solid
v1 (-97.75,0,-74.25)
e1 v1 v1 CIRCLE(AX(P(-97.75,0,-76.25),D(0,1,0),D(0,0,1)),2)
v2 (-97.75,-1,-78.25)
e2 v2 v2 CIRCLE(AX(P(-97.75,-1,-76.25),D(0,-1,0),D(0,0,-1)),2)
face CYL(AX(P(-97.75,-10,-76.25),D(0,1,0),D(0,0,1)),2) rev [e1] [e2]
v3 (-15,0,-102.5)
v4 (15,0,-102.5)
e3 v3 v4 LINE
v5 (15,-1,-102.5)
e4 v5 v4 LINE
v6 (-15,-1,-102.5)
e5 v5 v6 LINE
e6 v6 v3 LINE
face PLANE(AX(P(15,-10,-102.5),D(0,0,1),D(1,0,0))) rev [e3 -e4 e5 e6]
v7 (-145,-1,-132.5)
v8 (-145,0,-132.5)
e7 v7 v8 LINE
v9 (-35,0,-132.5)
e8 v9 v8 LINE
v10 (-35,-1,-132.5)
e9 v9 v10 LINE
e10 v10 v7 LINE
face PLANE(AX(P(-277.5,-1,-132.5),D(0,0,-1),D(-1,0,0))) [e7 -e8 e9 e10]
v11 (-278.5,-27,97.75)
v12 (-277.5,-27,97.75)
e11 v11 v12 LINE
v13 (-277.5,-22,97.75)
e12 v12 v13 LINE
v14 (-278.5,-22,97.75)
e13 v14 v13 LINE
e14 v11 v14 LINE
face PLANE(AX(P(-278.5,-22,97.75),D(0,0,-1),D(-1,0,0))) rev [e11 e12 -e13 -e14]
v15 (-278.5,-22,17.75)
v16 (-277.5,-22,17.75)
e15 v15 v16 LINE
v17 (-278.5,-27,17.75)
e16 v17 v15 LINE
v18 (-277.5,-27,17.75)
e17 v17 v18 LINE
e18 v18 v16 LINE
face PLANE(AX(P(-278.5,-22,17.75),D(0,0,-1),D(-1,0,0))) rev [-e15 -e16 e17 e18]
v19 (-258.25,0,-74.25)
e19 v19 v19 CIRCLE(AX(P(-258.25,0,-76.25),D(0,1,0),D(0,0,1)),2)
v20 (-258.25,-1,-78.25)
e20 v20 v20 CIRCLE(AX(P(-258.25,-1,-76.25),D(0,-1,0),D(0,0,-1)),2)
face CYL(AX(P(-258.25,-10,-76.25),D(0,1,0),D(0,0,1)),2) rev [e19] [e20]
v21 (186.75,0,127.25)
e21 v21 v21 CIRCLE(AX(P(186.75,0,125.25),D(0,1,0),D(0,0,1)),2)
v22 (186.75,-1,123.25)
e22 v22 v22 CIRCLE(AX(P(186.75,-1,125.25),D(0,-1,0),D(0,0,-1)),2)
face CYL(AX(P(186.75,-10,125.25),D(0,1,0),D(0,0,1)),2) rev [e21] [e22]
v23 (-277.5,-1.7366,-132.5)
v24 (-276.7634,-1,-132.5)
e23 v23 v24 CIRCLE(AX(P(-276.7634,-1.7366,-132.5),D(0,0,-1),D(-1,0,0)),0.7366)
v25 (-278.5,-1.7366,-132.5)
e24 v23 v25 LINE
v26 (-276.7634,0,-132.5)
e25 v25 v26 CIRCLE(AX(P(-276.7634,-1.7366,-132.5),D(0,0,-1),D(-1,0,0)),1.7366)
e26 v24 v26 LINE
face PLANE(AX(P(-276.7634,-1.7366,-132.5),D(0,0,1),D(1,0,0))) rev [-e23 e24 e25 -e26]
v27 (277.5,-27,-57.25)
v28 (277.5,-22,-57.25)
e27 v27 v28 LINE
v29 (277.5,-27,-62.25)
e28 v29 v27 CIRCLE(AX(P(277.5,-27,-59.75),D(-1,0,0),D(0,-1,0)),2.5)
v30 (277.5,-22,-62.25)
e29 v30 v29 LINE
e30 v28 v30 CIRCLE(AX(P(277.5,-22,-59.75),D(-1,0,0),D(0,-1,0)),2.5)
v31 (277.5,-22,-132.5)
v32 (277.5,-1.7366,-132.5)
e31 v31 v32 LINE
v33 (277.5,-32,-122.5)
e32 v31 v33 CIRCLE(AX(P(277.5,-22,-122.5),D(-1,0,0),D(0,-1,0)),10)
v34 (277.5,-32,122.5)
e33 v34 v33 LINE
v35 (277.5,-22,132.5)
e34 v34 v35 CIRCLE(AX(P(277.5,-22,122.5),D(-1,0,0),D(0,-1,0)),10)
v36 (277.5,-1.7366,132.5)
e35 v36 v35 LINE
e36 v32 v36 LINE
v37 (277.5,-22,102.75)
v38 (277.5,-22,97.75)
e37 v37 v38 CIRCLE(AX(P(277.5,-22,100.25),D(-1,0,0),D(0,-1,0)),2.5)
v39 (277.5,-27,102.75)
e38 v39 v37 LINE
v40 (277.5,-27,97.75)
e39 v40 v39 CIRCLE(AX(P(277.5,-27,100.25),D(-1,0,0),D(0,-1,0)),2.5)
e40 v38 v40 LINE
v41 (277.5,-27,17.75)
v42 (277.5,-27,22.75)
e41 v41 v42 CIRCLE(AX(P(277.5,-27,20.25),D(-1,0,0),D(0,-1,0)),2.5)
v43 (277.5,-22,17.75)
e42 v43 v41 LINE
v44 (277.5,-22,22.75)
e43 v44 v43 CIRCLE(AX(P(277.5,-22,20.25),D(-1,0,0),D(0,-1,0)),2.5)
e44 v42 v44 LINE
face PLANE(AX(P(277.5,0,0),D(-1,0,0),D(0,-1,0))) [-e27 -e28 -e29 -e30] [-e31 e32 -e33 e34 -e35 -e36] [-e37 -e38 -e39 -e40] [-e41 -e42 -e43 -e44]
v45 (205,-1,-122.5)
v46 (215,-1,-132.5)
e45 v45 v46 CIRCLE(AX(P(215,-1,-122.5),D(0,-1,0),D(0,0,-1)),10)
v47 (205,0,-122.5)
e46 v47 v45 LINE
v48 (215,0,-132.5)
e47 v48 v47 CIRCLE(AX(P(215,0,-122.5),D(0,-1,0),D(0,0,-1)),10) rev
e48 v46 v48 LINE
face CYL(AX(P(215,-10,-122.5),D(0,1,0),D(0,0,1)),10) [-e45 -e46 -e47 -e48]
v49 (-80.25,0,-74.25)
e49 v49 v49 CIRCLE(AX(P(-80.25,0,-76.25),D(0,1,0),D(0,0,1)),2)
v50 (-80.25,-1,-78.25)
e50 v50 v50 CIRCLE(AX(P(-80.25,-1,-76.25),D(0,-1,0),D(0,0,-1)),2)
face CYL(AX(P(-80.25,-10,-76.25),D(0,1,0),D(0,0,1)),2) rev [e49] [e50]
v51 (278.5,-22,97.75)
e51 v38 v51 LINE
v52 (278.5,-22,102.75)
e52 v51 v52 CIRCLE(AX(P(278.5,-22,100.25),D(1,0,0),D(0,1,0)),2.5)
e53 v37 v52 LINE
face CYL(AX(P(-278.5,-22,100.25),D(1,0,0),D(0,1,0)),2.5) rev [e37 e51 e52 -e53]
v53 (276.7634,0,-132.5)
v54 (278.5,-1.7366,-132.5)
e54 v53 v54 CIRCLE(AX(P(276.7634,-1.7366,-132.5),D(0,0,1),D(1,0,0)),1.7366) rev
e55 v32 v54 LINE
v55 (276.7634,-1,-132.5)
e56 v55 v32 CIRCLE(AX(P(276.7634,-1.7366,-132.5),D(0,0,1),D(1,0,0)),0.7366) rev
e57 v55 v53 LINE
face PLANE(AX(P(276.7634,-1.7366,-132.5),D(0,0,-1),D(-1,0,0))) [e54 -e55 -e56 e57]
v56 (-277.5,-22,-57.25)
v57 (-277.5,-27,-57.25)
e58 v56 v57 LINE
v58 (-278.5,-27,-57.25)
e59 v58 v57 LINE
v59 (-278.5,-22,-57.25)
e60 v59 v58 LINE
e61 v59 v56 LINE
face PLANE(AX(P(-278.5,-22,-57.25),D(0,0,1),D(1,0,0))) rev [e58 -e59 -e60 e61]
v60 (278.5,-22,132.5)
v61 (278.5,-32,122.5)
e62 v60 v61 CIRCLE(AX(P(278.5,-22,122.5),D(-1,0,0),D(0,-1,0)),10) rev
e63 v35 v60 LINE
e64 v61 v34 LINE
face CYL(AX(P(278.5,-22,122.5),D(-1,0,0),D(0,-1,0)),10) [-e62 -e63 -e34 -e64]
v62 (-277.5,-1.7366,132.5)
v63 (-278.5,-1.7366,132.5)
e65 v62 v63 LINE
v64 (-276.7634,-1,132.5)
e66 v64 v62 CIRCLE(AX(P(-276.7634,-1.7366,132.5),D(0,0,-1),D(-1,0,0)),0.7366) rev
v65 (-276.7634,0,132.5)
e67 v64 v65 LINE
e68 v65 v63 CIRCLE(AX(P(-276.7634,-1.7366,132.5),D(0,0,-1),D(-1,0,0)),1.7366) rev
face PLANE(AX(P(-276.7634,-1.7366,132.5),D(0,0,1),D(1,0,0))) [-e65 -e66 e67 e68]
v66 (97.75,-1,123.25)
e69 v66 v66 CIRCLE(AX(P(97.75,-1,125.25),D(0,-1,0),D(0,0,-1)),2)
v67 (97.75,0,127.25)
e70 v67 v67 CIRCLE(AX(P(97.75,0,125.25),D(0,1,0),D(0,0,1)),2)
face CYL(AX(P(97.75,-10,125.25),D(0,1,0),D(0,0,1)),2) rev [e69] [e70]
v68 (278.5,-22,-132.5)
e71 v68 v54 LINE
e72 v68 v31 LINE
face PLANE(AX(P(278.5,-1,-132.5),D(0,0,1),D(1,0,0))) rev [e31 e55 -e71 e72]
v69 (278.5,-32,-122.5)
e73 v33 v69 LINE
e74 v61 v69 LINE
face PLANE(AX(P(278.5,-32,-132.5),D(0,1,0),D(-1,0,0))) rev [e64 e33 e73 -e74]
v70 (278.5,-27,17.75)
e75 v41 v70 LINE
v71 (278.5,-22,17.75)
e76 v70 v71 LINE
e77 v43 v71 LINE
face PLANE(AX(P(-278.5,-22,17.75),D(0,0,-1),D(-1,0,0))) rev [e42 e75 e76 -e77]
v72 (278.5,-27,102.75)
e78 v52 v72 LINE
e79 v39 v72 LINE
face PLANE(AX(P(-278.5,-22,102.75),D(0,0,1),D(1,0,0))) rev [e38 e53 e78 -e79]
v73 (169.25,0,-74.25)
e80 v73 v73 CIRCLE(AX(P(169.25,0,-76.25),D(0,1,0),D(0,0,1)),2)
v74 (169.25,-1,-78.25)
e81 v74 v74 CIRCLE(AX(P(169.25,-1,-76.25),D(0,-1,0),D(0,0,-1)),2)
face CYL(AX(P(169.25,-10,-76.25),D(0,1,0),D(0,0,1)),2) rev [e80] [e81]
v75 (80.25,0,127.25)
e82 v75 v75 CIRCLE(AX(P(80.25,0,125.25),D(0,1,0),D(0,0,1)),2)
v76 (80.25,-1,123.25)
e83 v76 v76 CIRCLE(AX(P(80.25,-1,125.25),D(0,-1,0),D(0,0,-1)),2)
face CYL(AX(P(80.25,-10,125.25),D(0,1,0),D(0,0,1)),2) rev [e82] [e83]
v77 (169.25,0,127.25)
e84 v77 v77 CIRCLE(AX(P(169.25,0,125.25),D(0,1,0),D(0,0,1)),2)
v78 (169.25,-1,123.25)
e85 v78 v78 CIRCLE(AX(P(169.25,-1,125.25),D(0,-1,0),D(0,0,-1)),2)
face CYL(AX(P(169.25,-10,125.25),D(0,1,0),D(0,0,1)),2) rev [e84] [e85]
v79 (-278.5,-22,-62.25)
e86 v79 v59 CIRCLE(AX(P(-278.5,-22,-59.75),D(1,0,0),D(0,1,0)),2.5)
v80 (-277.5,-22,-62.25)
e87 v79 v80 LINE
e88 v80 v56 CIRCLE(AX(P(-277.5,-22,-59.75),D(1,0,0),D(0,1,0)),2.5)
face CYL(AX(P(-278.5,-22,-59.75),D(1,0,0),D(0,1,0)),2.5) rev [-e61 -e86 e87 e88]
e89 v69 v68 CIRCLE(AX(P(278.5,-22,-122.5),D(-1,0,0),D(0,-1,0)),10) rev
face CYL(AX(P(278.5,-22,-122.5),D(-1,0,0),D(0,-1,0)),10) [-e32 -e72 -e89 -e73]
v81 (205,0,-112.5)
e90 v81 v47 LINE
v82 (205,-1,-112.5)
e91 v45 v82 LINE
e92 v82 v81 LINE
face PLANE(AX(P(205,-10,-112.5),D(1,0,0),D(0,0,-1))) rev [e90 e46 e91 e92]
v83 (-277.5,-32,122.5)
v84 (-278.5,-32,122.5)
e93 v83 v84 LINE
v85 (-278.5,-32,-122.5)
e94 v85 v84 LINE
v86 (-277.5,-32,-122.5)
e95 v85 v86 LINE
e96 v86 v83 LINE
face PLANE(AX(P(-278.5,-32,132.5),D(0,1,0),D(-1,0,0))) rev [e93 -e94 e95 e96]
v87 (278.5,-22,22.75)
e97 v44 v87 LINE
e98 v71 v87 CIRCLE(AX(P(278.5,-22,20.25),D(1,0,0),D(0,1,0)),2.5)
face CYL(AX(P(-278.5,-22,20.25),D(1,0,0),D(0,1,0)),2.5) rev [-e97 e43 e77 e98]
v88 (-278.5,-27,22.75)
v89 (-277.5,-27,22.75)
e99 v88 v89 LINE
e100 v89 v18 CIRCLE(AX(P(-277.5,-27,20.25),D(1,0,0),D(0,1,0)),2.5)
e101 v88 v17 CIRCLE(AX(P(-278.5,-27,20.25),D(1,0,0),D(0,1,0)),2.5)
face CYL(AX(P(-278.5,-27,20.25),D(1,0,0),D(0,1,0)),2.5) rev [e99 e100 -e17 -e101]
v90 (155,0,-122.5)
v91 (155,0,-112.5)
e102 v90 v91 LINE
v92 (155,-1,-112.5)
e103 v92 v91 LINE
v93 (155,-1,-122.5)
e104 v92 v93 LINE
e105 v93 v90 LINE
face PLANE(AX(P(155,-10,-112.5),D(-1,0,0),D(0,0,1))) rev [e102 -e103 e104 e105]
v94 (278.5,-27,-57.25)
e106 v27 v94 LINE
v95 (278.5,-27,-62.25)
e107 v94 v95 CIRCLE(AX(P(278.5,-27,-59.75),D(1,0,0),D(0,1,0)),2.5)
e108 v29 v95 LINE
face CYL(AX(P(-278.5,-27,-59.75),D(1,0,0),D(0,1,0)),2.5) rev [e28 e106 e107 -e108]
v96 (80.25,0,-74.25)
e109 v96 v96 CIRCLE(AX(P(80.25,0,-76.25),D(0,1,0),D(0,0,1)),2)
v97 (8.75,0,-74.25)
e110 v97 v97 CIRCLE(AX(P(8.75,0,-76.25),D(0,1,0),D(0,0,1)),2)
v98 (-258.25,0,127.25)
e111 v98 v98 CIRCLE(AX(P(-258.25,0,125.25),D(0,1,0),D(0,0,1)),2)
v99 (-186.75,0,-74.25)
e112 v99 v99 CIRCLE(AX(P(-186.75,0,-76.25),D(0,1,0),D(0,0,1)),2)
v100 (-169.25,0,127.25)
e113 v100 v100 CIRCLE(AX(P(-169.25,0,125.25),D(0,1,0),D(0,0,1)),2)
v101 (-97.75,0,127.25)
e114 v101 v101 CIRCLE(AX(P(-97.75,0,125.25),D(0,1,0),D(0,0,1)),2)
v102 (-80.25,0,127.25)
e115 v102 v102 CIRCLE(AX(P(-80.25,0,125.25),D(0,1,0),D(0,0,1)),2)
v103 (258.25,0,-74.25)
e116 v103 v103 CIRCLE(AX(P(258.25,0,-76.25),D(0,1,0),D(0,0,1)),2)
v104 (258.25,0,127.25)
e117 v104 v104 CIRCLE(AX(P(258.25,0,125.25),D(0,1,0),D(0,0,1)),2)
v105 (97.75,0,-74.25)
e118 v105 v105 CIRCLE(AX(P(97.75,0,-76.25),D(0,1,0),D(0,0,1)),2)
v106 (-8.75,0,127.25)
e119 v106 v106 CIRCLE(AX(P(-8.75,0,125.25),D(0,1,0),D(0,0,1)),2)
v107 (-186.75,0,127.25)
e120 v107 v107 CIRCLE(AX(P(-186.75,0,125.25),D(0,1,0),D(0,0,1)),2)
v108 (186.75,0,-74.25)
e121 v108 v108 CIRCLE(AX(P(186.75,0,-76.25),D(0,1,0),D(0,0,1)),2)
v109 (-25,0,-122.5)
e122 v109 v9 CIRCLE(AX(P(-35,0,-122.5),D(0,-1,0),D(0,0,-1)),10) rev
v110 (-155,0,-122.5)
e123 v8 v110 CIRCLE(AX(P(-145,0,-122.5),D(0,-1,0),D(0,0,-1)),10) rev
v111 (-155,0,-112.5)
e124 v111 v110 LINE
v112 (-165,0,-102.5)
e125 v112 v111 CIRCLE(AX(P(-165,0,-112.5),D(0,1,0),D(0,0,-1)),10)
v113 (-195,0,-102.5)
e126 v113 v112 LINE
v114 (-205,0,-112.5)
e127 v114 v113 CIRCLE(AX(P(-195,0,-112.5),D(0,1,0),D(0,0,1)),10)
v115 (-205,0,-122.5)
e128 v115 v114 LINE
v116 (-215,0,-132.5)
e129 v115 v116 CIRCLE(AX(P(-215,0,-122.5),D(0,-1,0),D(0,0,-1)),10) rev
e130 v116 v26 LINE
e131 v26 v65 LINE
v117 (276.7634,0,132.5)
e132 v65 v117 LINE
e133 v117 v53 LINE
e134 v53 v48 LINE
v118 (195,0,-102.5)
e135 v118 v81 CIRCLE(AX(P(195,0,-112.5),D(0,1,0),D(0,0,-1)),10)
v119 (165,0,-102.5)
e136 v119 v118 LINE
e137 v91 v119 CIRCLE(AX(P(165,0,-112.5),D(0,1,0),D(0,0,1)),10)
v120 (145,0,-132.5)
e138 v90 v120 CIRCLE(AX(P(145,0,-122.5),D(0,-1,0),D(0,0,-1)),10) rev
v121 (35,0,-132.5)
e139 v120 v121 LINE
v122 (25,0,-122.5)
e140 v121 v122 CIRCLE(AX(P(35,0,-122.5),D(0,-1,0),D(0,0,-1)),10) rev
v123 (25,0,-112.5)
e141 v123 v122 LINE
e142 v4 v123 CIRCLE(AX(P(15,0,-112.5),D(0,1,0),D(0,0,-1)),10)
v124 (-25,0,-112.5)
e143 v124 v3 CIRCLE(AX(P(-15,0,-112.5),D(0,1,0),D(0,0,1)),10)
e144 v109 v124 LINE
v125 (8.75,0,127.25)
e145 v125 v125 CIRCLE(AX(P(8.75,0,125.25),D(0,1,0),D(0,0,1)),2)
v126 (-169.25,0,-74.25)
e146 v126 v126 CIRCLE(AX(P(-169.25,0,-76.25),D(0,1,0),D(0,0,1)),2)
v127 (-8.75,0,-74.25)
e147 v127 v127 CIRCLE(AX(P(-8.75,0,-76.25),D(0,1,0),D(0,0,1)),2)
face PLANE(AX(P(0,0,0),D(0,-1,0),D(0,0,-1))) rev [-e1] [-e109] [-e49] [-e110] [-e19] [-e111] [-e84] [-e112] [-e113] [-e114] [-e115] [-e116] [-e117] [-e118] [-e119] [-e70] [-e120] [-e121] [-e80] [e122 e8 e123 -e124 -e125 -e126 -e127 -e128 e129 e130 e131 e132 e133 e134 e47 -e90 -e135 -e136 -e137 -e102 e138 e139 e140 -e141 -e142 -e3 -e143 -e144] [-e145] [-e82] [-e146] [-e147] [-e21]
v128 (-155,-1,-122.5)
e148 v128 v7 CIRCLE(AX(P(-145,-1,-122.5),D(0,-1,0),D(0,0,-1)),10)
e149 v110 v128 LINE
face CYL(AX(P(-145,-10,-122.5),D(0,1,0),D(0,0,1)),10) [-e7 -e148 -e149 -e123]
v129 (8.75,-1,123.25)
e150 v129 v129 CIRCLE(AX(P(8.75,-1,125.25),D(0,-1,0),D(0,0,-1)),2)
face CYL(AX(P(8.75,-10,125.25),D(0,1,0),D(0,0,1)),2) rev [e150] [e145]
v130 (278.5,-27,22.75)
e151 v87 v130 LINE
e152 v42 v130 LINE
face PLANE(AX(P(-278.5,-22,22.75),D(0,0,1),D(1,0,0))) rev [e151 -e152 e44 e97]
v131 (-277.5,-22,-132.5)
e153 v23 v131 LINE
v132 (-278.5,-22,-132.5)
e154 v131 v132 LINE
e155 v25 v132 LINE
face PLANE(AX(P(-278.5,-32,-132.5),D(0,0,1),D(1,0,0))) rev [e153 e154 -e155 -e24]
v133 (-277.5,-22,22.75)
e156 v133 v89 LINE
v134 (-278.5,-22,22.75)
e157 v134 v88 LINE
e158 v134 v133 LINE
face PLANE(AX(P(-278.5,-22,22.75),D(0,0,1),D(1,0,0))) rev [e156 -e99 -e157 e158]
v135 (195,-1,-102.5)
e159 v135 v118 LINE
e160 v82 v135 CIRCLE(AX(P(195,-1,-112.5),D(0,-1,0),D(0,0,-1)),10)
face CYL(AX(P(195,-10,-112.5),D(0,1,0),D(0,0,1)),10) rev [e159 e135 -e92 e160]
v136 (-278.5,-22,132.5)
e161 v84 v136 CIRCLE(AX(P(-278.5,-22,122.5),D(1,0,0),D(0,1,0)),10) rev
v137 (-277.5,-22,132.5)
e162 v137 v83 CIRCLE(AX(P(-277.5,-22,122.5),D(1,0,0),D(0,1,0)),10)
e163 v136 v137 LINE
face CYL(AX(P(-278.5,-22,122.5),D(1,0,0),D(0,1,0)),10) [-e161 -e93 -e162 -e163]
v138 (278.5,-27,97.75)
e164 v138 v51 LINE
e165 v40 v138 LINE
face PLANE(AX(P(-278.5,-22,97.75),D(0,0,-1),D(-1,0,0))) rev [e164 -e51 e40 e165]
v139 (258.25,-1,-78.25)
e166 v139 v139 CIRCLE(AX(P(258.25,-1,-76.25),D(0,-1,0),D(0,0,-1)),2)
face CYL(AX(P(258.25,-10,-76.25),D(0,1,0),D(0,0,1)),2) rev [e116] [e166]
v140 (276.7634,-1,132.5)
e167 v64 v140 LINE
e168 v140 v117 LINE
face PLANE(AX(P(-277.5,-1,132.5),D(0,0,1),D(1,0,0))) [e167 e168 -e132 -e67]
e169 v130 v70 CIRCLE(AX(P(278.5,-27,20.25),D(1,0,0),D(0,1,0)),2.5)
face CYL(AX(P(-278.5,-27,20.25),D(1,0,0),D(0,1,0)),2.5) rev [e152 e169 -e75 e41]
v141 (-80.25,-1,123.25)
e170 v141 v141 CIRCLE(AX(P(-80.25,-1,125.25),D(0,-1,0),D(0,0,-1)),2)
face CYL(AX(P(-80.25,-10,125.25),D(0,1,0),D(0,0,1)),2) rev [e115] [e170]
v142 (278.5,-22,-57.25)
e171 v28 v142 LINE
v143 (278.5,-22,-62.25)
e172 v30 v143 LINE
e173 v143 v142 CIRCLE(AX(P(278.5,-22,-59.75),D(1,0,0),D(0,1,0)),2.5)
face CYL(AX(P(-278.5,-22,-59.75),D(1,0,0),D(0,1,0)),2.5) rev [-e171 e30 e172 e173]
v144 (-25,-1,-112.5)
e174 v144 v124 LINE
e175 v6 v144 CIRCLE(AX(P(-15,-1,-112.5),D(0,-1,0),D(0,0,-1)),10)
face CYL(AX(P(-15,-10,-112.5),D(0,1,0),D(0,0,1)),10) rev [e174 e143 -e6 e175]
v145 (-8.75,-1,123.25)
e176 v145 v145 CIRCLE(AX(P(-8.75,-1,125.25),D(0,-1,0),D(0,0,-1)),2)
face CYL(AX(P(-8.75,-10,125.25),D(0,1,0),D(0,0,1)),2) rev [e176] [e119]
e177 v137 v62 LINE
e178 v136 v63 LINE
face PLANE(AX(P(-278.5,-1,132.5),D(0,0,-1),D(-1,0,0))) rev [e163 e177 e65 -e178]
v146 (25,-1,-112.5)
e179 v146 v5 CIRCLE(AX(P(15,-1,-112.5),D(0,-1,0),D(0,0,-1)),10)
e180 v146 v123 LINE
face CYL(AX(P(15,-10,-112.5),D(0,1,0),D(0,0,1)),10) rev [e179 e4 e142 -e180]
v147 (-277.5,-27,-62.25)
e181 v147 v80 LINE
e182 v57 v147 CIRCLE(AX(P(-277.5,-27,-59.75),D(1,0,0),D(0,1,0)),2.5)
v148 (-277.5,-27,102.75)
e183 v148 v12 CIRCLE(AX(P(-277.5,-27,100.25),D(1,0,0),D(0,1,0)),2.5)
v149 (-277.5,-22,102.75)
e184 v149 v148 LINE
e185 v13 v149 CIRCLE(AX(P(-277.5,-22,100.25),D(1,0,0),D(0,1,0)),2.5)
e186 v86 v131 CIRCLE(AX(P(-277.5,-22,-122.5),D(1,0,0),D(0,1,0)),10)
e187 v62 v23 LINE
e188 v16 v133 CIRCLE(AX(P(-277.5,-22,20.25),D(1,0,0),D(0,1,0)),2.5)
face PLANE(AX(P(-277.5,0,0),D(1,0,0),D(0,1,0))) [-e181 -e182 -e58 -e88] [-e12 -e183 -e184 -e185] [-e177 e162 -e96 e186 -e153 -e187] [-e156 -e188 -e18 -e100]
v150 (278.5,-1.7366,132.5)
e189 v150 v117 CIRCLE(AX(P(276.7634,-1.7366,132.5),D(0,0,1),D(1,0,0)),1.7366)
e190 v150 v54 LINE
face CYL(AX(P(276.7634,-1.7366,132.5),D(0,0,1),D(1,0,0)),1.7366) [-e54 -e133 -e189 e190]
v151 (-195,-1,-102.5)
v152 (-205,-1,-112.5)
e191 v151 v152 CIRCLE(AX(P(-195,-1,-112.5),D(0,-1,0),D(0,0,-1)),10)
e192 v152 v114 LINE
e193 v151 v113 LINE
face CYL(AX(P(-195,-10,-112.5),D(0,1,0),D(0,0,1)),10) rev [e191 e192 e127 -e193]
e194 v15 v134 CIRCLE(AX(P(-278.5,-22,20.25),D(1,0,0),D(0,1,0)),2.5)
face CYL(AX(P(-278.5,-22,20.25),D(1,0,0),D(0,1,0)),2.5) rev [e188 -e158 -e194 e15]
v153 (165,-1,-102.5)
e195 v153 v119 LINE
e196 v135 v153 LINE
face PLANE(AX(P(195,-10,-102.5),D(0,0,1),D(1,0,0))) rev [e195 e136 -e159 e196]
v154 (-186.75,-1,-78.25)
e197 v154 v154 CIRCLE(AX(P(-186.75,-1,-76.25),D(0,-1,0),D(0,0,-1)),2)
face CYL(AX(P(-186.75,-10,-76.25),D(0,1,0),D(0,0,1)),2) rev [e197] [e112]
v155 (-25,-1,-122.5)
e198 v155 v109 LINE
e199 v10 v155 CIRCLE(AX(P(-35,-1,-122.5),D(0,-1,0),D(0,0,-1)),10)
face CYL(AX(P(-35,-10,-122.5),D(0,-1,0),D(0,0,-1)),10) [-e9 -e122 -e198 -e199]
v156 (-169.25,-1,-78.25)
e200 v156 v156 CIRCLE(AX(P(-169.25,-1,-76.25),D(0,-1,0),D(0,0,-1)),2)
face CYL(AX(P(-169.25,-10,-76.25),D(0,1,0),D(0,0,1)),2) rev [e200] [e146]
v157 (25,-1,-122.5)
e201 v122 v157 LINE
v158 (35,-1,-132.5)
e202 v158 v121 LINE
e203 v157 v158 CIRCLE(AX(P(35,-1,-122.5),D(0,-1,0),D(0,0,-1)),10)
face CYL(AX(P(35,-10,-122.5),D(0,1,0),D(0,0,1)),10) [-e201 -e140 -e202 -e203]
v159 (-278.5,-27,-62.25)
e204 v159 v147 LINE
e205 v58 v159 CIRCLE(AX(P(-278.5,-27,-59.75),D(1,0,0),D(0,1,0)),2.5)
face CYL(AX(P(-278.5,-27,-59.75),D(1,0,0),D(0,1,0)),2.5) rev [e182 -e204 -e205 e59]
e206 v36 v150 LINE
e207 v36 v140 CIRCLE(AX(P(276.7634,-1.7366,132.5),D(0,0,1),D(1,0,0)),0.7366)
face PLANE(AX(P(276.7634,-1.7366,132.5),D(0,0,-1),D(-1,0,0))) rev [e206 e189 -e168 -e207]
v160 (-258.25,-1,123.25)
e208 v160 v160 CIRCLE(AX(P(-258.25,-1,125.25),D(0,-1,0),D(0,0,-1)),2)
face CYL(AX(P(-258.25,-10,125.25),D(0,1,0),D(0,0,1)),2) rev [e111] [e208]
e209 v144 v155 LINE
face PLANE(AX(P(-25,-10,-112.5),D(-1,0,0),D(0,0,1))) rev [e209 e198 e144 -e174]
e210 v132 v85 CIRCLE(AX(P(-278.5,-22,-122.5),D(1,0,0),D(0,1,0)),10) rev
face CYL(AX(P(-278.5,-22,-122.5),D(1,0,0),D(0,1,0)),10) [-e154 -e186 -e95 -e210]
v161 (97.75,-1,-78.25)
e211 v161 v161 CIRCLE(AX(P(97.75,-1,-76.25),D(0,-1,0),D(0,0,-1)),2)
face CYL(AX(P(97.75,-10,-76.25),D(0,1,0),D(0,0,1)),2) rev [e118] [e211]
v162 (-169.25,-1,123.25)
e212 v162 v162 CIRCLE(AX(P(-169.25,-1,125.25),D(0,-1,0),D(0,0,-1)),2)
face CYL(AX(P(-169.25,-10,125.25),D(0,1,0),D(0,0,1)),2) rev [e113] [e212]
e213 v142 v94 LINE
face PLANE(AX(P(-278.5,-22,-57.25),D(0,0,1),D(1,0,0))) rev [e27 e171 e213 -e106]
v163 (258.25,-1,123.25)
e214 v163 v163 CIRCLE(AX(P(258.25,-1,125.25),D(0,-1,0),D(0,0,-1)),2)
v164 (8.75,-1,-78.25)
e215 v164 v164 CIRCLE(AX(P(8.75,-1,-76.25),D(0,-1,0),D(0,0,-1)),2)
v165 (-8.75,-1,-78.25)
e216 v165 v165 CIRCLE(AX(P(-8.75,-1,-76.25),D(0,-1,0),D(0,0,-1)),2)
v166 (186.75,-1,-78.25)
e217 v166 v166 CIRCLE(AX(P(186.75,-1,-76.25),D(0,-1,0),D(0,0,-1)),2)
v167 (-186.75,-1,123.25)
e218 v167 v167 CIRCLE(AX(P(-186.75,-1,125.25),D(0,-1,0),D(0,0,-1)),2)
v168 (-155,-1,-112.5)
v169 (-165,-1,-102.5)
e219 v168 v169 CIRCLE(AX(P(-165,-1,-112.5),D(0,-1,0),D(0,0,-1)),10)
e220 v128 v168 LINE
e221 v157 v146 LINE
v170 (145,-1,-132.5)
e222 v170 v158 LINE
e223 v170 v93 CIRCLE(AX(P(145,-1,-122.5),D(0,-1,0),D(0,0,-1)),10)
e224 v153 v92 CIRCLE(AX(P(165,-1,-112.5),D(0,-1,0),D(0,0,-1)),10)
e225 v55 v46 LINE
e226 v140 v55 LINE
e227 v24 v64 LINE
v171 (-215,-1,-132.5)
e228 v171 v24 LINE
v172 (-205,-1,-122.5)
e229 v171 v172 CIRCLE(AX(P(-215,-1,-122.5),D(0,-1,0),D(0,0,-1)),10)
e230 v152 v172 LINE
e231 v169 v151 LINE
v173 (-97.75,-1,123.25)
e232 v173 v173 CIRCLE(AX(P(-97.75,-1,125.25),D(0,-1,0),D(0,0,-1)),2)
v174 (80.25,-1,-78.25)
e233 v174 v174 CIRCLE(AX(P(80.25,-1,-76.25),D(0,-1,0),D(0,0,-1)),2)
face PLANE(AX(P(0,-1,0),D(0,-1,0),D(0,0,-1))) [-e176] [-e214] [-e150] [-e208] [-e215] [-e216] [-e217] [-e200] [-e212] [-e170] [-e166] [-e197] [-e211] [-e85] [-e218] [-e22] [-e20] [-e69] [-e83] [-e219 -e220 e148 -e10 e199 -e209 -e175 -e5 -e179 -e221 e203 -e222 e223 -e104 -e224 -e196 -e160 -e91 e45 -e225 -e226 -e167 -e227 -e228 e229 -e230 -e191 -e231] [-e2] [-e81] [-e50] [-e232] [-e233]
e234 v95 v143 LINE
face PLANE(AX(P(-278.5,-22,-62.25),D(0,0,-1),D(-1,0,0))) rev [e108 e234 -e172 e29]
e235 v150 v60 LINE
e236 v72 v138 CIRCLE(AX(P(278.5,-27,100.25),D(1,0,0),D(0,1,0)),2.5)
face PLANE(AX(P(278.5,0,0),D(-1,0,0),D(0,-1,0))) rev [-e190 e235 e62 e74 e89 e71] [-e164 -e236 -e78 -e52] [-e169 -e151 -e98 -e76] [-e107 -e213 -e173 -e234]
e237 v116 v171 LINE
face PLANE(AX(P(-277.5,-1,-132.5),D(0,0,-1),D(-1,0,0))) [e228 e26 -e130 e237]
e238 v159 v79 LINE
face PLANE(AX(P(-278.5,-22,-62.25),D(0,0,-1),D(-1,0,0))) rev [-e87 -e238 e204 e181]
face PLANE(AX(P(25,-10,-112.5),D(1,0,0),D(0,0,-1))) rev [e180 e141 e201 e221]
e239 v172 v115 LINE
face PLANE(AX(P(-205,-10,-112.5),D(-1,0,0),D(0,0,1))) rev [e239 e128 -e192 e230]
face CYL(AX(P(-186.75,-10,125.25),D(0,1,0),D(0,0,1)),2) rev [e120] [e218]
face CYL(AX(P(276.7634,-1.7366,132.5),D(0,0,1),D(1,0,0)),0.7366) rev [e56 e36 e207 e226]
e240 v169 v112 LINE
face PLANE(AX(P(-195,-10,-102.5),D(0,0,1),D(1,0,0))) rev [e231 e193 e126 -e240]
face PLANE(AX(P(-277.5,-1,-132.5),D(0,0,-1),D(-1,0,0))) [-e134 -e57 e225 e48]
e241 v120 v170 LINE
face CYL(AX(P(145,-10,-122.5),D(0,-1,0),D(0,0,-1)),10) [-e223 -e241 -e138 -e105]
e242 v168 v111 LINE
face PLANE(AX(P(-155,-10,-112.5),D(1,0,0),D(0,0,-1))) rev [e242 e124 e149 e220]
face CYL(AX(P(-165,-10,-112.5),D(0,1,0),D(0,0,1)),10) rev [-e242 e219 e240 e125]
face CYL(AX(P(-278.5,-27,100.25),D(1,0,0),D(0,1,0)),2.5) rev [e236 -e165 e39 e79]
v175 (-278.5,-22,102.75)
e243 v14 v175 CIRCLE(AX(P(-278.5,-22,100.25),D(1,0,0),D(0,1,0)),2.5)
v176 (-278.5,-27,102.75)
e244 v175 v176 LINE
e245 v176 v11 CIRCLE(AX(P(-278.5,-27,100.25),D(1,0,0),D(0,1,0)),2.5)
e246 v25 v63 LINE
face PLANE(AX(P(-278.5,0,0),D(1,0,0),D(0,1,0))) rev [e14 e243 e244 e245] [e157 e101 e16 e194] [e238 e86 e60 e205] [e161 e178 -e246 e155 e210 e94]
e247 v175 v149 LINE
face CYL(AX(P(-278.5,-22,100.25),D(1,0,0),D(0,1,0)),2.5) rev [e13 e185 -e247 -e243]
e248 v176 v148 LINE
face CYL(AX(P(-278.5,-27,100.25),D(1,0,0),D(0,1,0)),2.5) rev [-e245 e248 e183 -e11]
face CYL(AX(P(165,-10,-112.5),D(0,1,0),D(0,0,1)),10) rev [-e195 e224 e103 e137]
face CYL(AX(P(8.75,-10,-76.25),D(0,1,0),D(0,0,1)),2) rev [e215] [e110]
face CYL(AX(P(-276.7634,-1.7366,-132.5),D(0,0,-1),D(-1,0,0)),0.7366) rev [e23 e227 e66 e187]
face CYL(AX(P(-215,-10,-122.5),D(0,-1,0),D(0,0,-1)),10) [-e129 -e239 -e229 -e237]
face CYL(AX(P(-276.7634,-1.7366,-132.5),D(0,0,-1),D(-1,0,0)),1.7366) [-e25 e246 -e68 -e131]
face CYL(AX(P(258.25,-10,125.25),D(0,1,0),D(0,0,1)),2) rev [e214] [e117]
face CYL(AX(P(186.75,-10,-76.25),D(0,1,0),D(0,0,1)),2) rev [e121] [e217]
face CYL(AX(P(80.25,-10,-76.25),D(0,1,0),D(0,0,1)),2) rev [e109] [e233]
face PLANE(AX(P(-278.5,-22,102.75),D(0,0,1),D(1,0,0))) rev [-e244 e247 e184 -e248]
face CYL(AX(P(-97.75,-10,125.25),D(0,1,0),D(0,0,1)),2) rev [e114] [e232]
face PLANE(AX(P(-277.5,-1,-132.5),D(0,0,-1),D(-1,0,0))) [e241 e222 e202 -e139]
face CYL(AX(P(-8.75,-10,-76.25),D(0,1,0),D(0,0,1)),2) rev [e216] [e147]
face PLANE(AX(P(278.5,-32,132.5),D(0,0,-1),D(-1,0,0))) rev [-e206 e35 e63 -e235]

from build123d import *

# Parameters (mm, degrees)
SZKIC2_W                             = 555
SZKIC2_H                             = 265
ODGI_CIE_BAZOWE1_DEPTH               = 1
ODGI_CIE_KRAW_DZI1_STRIP_W           = 5.4732
ODGI_CIE_KRAW_DZI1_STRIP_H           = 1
ODGI_CIE_KRAW_DZI1_STRIP_CUT_DEPTH   = 265
ODGI_CIE_KRAW_DZI1_STRIP_2_W         = 5.4732
ODGI_CIE_KRAW_DZI1_STRIP_2_H         = 1
ODGI_CIE_KRAW_DZI1_STRIP_CUT_2_DEPTH = 265
ODGI_CIE_KRAW_DZI1_DEPTH             = 265
ODGI_CIE_KRAW_DZI1_BEND_DEPTH        = 265
WYTNIJ_WYCI_GNI_CIE3_DEPTH           = 574.436352179
ZAOKR_GLENIE2_R                      = 10
SZKIC16_R                            = 2
WYTNIJ_WYCI_GNI_CIE4_DEPTH           = 10
WYTNIJ_WYCI_GNI_CIE5_DEPTH           = 10
ZAOKR_GLENIE3_R                      = 10


# Sheet-metal steps are written as plain solids
with BuildPart() as part:
    # Szkic2 → Odgięcie bazowe1 (new body)
    with BuildSketch(Plane(origin=(0, 0, 0), x_dir=(1, 0, 0), z_dir=(0, 1, 0))):
        Rectangle(SZKIC2_W, SZKIC2_H)
    extrude(amount=-ODGI_CIE_BAZOWE1_DEPTH)

    # Odgięcie krawędzi1 strip (across the edge) → Odgięcie krawędzi1 strip cut (cut)
    with BuildSketch(Plane(origin=(-277.5, -1, 132.5), x_dir=(1, 0, 0), z_dir=(0, 0, -1))):
        with Locations((-2, -0.5)):
            Rectangle(ODGI_CIE_KRAW_DZI1_STRIP_W, ODGI_CIE_KRAW_DZI1_STRIP_H)
    extrude(amount=ODGI_CIE_KRAW_DZI1_STRIP_CUT_DEPTH, mode=Mode.SUBTRACT)

    # Odgięcie krawędzi1 strip 2 (across the edge) → Odgięcie krawędzi1 strip cut 2 (cut)
    with BuildSketch(Plane(origin=(277.5, -1, -132.5), x_dir=(-1, 0, 0), z_dir=(0, 0, 1))):
        with Locations((-2, -0.5)):
            Rectangle(ODGI_CIE_KRAW_DZI1_STRIP_2_W, ODGI_CIE_KRAW_DZI1_STRIP_2_H)
    extrude(amount=ODGI_CIE_KRAW_DZI1_STRIP_CUT_2_DEPTH, mode=Mode.SUBTRACT)

    # Odgięcie krawędzi1 section (across the edge) → Odgięcie krawędzi1 (add)
    with BuildSketch(Plane(origin=(-277.5, -1, 132.5), x_dir=(1, 0, 0), z_dir=(0, 0, -1))):
        with BuildLine():
            Line((-1, 0.7366), (-1, 31))
            Line((-1, 31), (0, 31))
            Line((0, 31), (0, 0.7366))
            ThreePointArc((0, 0.7366), (0.215745145, 0.215745145), (0.7366, 0))
            Line((0.7366, 0), (0.7366, -1))
            ThreePointArc((0.7366, -1), (-0.491361636, -0.491361636), (-1, 0.7366))
        make_face()
    extrude(amount=ODGI_CIE_KRAW_DZI1_DEPTH)

    # Odgięcie krawędzi1 section 2 (across the edge) → Odgięcie krawędzi1 bend (add)
    with BuildSketch(Plane(origin=(277.5, -1, -132.5), x_dir=(-1, 0, 0), z_dir=(0, 0, 1))):
        with BuildLine():
            Line((-1, 0.7366), (-1, 31))
            Line((-1, 31), (0, 31))
            Line((0, 31), (0, 0.7366))
            ThreePointArc((0, 0.7366), (0.215745145, 0.215745145), (0.7366, 0))
            Line((0.7366, 0), (0.7366, -1))
            ThreePointArc((0.7366, -1), (-0.491361636, -0.491361636), (-1, 0.7366))
        make_face()
    extrude(amount=ODGI_CIE_KRAW_DZI1_BEND_DEPTH)

    # Szkic15 → Wytnij-wyciągnięcie3 (cut, through all)
    with BuildSketch(Plane(origin=(278.5, 0, 0), x_dir=(0, 0, -1), z_dir=(1, 0, 0))):
        with BuildLine():
            Line((-97.75, -22), (-97.75, -27))
            ThreePointArc((-97.75, -27), (-100.25, -29.5), (-102.75, -27))
            Line((-102.75, -27), (-102.75, -22))
            ThreePointArc((-102.75, -22), (-100.25, -19.5), (-97.75, -22))
        make_face()
        with BuildLine():
            Line((-22.75, -22), (-22.75, -27))
            ThreePointArc((-22.75, -27), (-20.25, -29.5), (-17.75, -27))
            Line((-17.75, -27), (-17.75, -22))
            ThreePointArc((-17.75, -22), (-20.25, -19.5), (-22.75, -22))
        make_face()
        with BuildLine():
            Line((57.25, -22), (57.25, -27))
            ThreePointArc((57.25, -27), (59.75, -29.5), (62.25, -27))
            Line((62.25, -27), (62.25, -22))
            ThreePointArc((62.25, -22), (59.75, -19.5), (57.25, -22))
        make_face()
    extrude(amount=-WYTNIJ_WYCI_GNI_CIE3_DEPTH, mode=Mode.SUBTRACT)

    # Zaokrąglenie2
    zaokr_glenie2_edges = [part.edges().sort_by_distance(p)[0] for p in [
        (-278, -32, 132.5),
        (-278, -32, -132.5),
        (278, -32, -132.5),
        (278, -32, 132.5),
    ]]
    fillet(zaokr_glenie2_edges, radius=ZAOKR_GLENIE2_R)

    # Szkic16 → Wytnij-wyciągnięcie4 (cut)
    with BuildSketch(Plane(origin=(0, 0, 0), x_dir=(1, 0, 0), z_dir=(0, 1, 0))):
        with Locations(Location((-258.25, -125.25, 0), (0, 0, 270))):
            Circle(SZKIC16_R)
        with Locations(Location((-186.75, -125.25, 0), (0, 0, 270))):
            Circle(SZKIC16_R)
        with Locations(Location((-258.25, 76.25, 0), (0, 0, 270))):
            Circle(SZKIC16_R)
        with Locations(Location((-186.75, 76.25, 0), (0, 0, 270))):
            Circle(SZKIC16_R)
        with Locations(Location((-169.25, 76.25, 0), (0, 0, 270))):
            Circle(SZKIC16_R)
        with Locations(Location((-97.75, 76.25, 0), (0, 0, 270))):
            Circle(SZKIC16_R)
        with Locations(Location((-169.25, -125.25, 0), (0, 0, 270))):
            Circle(SZKIC16_R)
        with Locations(Location((-97.75, -125.25, 0), (0, 0, 270))):
            Circle(SZKIC16_R)
        with Locations(Location((-80.25, 76.25, 0), (0, 0, 270))):
            Circle(SZKIC16_R)
        with Locations(Location((-8.75, 76.25, 0), (0, 0, 270))):
            Circle(SZKIC16_R)
        with Locations(Location((-80.25, -125.25, 0), (0, 0, 270))):
            Circle(SZKIC16_R)
        with Locations(Location((-8.75, -125.25, 0), (0, 0, 270))):
            Circle(SZKIC16_R)
        with Locations(Location((8.75, 76.25, 0), (0, 0, 270))):
            Circle(SZKIC16_R)
        with Locations(Location((80.25, 76.25, 0), (0, 0, 270))):
            Circle(SZKIC16_R)
        with Locations(Location((8.75, -125.25, 0), (0, 0, 270))):
            Circle(SZKIC16_R)
        with Locations(Location((80.25, -125.25, 0), (0, 0, 270))):
            Circle(SZKIC16_R)
        with Locations(Location((97.75, 76.25, 0), (0, 0, 270))):
            Circle(SZKIC16_R)
        with Locations(Location((169.25, 76.25, 0), (0, 0, 270))):
            Circle(SZKIC16_R)
        with Locations(Location((97.75, -125.25, 0), (0, 0, 270))):
            Circle(SZKIC16_R)
        with Locations(Location((169.25, -125.25, 0), (0, 0, 270))):
            Circle(SZKIC16_R)
        with Locations(Location((186.75, 76.25, 0), (0, 0, 270))):
            Circle(SZKIC16_R)
        with Locations(Location((258.25, 76.25, 0), (0, 0, 270))):
            Circle(SZKIC16_R)
        with Locations(Location((186.75, -125.25, 0), (0, 0, 270))):
            Circle(SZKIC16_R)
        with Locations(Location((258.25, -125.25, 0), (0, 0, 270))):
            Circle(SZKIC16_R)
    extrude(amount=-WYTNIJ_WYCI_GNI_CIE4_DEPTH, mode=Mode.SUBTRACT)

    # Szkic17 → Wytnij-wyciągnięcie5 (cut)
    with BuildSketch(Plane(origin=(0, 0, 0), x_dir=(1, 0, 0), z_dir=(0, 1, 0))):
        with BuildLine():
            Line((15, 102.5), (-15, 102.5))
            ThreePointArc((-15, 102.5), (-22.071067812, 105.428932188), (-25, 112.5))
            Line((-25, 112.5), (-25, 132.5))
            Line((-25, 132.5), (25, 132.5))
            Line((25, 132.5), (25, 112.5))
            ThreePointArc((25, 112.5), (22.071067812, 105.428932188), (15, 102.5))
        make_face()
        with BuildLine():
            Line((155, 132.5), (205, 132.5))
            Line((205, 132.5), (205, 112.5))
            ThreePointArc((205, 112.5), (202.071067812, 105.428932188), (195, 102.5))
            Line((195, 102.5), (165, 102.5))
            ThreePointArc((165, 102.5), (157.928932188, 105.428932188), (155, 112.5))
            Line((155, 112.5), (155, 132.5))
        make_face()
        with BuildLine():
            Line((-155, 112.5), (-155, 132.5))
            Line((-155, 132.5), (-205, 132.5))
            Line((-205, 132.5), (-205, 112.5))
            ThreePointArc((-205, 112.5), (-202.071067812, 105.428932188), (-195, 102.5))
            Line((-195, 102.5), (-165, 102.5))
            ThreePointArc((-165, 102.5), (-157.928932188, 105.428932188), (-155, 112.5))
        make_face()
    extrude(amount=-WYTNIJ_WYCI_GNI_CIE5_DEPTH, mode=Mode.SUBTRACT)

    # Zaokrąglenie3
    zaokr_glenie3_edges = [part.edges().sort_by_distance(p)[0] for p in [
        (25, -0.5, -132.5),
        (-25, -0.5, -132.5),
        (-155, -0.5, -132.5),
        (-205, -0.5, -132.5),
        (205, -0.5, -132.5),
        (155, -0.5, -132.5),
    ]]
    fillet(zaokr_glenie3_edges, radius=ZAOKR_GLENIE3_R)


solid = part.part
